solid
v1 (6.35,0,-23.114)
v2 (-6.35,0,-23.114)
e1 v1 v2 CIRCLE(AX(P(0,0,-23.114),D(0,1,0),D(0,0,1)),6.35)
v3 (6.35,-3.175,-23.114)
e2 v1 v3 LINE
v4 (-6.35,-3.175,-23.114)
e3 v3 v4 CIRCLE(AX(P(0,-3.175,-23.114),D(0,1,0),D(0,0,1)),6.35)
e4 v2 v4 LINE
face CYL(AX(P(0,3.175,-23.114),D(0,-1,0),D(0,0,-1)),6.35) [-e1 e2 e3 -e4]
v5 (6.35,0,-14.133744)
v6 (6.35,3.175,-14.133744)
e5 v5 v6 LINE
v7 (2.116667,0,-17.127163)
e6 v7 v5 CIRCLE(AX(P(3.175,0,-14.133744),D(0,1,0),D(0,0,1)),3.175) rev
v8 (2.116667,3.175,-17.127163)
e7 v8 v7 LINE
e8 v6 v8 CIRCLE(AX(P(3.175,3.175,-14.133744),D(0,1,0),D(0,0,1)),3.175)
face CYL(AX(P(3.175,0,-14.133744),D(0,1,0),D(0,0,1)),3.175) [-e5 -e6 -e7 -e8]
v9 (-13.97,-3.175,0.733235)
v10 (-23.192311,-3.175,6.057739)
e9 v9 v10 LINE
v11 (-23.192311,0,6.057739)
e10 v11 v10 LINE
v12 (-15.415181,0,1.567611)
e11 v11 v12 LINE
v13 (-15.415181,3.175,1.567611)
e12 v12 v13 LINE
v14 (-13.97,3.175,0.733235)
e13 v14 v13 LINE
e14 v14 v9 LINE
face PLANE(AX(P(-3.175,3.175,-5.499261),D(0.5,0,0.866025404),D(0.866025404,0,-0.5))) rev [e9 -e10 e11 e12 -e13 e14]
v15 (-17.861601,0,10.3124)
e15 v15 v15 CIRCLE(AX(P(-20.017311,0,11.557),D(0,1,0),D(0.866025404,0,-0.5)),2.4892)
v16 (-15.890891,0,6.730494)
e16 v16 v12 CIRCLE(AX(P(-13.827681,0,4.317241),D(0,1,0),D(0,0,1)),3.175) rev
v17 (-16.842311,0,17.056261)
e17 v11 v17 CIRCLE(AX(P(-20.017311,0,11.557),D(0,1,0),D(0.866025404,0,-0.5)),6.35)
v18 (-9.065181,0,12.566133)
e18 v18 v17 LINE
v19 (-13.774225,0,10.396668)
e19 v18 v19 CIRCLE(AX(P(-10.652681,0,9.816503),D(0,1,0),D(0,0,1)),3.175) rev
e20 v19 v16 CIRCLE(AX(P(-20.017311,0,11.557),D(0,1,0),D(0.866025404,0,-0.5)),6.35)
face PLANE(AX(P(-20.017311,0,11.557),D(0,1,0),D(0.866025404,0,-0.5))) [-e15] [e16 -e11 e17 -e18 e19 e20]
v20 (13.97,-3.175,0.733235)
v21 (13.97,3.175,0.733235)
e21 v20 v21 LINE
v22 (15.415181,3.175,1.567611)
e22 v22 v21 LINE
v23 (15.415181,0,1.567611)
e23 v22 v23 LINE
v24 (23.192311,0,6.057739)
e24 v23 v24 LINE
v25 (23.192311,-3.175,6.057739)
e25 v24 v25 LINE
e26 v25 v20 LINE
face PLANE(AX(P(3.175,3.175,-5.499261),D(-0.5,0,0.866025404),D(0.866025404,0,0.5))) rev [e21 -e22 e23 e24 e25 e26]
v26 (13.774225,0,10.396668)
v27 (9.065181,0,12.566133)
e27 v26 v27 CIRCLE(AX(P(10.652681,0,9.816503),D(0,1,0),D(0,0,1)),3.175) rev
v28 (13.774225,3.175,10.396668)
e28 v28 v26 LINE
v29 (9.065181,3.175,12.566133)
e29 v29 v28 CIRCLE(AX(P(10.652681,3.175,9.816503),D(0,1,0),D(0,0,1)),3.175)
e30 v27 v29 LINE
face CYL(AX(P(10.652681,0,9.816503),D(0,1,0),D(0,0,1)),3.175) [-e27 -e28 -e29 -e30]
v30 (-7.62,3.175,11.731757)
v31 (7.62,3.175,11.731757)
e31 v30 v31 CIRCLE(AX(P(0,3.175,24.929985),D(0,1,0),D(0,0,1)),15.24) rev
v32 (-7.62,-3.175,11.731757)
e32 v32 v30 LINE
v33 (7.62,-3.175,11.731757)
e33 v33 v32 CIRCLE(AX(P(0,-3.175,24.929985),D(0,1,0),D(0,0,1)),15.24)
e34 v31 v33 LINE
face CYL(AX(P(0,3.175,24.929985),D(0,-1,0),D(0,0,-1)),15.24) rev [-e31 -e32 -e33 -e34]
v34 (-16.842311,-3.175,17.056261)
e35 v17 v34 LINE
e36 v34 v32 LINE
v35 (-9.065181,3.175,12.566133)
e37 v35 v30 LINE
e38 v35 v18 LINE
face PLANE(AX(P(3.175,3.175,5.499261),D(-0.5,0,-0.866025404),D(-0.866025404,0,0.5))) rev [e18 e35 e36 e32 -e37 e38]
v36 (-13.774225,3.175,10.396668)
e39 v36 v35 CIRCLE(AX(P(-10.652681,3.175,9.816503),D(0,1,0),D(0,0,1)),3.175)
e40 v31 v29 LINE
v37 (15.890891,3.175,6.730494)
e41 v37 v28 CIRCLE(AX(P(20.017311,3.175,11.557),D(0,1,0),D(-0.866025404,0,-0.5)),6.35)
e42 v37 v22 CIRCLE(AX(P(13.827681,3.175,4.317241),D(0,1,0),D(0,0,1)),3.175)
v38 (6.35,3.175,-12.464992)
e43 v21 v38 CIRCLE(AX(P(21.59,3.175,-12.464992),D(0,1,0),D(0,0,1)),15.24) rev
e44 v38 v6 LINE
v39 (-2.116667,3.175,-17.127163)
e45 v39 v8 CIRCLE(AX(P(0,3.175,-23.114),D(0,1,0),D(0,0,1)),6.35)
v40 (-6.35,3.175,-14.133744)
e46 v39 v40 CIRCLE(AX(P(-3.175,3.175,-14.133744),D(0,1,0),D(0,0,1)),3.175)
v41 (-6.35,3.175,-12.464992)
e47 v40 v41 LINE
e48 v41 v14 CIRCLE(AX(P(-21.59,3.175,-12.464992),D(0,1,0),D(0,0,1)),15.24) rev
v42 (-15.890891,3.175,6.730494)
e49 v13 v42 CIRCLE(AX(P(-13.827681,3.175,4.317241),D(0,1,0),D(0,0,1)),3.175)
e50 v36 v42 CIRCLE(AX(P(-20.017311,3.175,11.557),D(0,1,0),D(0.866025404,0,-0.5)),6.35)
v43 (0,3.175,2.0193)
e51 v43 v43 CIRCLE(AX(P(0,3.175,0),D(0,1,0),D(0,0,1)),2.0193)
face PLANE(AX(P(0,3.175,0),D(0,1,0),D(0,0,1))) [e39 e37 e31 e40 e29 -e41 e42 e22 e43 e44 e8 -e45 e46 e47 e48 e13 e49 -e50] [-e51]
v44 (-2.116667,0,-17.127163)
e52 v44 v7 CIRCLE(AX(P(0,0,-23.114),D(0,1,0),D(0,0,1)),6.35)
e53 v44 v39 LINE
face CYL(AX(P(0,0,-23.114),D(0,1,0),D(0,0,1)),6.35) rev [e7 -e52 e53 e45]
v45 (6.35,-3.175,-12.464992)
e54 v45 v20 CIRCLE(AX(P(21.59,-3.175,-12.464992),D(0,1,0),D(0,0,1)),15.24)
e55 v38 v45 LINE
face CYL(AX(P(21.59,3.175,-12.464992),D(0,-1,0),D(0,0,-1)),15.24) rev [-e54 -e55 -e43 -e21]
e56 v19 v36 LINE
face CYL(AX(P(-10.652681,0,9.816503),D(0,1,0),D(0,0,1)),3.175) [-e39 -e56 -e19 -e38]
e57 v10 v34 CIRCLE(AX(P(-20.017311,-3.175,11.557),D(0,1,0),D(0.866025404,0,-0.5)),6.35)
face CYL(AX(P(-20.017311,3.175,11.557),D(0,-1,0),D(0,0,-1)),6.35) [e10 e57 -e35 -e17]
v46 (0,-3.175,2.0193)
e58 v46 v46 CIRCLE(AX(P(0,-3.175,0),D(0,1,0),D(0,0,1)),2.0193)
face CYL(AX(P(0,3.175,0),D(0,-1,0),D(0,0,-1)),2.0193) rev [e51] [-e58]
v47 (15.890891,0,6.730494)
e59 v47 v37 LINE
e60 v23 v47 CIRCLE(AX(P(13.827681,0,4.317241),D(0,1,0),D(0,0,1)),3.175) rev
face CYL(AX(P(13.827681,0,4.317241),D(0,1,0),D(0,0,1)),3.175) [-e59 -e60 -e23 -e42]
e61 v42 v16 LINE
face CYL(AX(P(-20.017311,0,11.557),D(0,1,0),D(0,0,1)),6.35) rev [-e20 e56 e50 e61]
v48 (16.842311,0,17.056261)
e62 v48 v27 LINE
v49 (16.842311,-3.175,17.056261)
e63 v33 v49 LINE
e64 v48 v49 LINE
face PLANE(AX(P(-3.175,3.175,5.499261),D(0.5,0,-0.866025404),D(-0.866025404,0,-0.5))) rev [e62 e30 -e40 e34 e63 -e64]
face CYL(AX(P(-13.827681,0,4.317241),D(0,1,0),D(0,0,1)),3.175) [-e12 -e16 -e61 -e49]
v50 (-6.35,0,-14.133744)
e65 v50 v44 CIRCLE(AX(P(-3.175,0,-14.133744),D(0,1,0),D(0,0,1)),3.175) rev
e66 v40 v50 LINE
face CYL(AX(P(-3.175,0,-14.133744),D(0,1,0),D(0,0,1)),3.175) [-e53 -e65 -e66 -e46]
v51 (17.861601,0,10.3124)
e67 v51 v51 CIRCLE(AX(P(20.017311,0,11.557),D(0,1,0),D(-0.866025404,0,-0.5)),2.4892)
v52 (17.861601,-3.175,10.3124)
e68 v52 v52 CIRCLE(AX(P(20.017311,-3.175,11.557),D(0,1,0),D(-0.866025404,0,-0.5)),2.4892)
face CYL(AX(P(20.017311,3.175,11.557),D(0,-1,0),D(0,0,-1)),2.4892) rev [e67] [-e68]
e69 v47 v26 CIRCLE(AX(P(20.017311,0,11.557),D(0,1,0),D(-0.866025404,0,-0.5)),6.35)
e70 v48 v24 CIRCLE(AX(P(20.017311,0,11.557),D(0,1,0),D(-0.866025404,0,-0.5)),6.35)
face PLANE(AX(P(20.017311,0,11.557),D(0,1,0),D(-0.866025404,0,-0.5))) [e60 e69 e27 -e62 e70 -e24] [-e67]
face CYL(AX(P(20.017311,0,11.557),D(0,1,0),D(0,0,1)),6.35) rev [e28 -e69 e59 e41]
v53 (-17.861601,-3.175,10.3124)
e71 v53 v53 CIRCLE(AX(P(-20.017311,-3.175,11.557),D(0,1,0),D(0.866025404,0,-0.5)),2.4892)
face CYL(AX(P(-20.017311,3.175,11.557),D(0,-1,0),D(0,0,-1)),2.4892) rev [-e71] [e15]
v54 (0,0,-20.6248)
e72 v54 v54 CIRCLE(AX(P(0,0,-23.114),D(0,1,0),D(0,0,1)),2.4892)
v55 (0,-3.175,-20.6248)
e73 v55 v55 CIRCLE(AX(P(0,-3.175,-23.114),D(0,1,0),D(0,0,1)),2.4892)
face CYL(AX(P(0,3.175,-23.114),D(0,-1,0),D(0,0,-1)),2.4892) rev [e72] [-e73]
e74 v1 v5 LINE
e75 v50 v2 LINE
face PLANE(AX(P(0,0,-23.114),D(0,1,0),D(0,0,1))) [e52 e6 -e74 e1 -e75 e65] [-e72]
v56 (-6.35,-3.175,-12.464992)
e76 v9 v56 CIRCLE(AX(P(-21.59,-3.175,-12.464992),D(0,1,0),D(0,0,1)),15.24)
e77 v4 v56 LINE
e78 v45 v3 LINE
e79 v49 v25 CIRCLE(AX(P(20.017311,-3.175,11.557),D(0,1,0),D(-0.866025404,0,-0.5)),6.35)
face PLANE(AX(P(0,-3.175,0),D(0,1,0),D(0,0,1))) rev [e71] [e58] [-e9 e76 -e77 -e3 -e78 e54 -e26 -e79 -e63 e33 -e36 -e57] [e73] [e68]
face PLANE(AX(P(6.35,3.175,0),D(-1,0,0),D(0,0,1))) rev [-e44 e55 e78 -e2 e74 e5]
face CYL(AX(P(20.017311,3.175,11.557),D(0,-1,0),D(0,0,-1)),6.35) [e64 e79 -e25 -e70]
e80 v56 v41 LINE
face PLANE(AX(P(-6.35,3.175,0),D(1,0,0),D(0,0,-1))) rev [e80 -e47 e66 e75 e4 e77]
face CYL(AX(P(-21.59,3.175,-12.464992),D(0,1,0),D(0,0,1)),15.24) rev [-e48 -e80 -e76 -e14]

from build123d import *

# Parameters (mm, degrees)
SKETCH1_R           = 2.0193
SKETCH1_R_2         = 2.4892
BOSS_EXTRUDE1_DEPTH = 3.175
SKETCH3_R           = 6.35
SKETCH3_R_2         = 2.4892
CUT_EXTRUDE1_DEPTH  = 3.175
CIRPATTERN1_COUNT   = 3
FILLET3_R           = 15.24
FILLET2_DEPTH       = 3.175


with BuildPart() as part:
    # Sketch1 → Boss-Extrude1 (new, symmetric)
    with BuildSketch(Plane(origin=(0, 0, 0), x_dir=(1, 0, 0), z_dir=(0, 1, 0))):
        with BuildLine():
            Line((-6.35, 0), (-6.35, 23.114))
            ThreePointArc((-6.35, 23.114), (0, 29.464), (6.35, 23.114))
            Line((6.35, 23.114), (6.35, 0))
            ThreePointArc((6.35, 0), (0, -6.35), (-6.35, 0))
        make_face()
        with Locations(Location((0, 0, 0), (0, 0, 270))):
            Circle(SKETCH1_R, mode=Mode.SUBTRACT)
        with Locations(Location((0, 23.114, 0), (0, 0, 270))):
            Circle(SKETCH1_R_2, mode=Mode.SUBTRACT)
    boss_extrude1 = extrude(amount=BOSS_EXTRUDE1_DEPTH, both=True)

    # Sketch3 → Cut-Extrude1 (cut)
    with BuildSketch(Plane(origin=(0, 3.175, 0), x_dir=(1, 0, 0), z_dir=(0, 1, 0))):
        with Locations((0, 23.114)):
            Circle(SKETCH3_R)
        with Locations(Location((0, 23.114, 0), (0, 0, 270))):
            Circle(SKETCH3_R_2, mode=Mode.SUBTRACT)
    cut_extrude1 = extrude(amount=-CUT_EXTRUDE1_DEPTH, mode=Mode.SUBTRACT)

    # CirPattern1: Boss-Extrude1, Cut-Extrude1 ×3 about axis
    cirpattern1_axis = Axis((0, 0, 0), (0, 1, 0))
    add([boss_extrude1.rotate(cirpattern1_axis, i * 360 / CIRPATTERN1_COUNT) for i in range(1, CIRPATTERN1_COUNT)])
    add([cut_extrude1.rotate(cirpattern1_axis, i * 360 / CIRPATTERN1_COUNT) for i in range(1, CIRPATTERN1_COUNT)], mode=Mode.SUBTRACT)

    # Fillet3
    fillet3_edges = [part.edges().sort_by_distance(p)[0] for p in [
        (-6.35, 0, -3.666174209),
        (6.35, 0, -3.666174209),
        (0, 0, 7.332348419),
    ]]
    fillet(fillet3_edges, radius=FILLET3_R)

    # Fillet2: read off the stored shape, not the designer's step
    # Fillet2 outline → Fillet2 (cut)
    with BuildSketch(Plane(origin=(0, 0, 0), x_dir=(1, 0, 0), z_dir=(0, 1, 0))):
        with BuildLine():
            ThreePointArc((15.41518125, -1.567610625), (16.989288832, -4.025929604), (15.890891228, -6.730494188))
            ThreePointArc((15.890891228, -6.730494188), (19.434687828, -5.233784835), (23.192311183, -6.057738686))
            Line((23.192311183, -6.057738686), (15.41518125, -1.567610625))
        make_face()
        with BuildLine():
            ThreePointArc((16.842311183, -17.056261314), (14.249934539, -14.214040956), (13.774224561, -10.396668398))
            ThreePointArc((13.774224561, -10.396668398), (11.981201728, -12.700190919), (9.06518125, -12.566133253))
            Line((9.06518125, -12.566133253), (16.842311183, -17.056261314))
        make_face()
        with BuildLine():
            ThreePointArc((-9.06518125, -12.566133253), (-11.981201728, -12.700190919), (-13.774224561, -10.396668398))
            ThreePointArc((-13.774224561, -10.396668398), (-14.249934539, -14.214040956), (-16.842311183, -17.056261314))
            Line((-16.842311183, -17.056261314), (-9.06518125, -12.566133253))
        make_face()
        with BuildLine():
            ThreePointArc((-23.192311183, -6.057738686), (-19.434687828, -5.233784835), (-15.890891228, -6.730494188))
            ThreePointArc((-15.890891228, -6.730494188), (-16.989288832, -4.025929604), (-15.41518125, -1.567610625))
            Line((-15.41518125, -1.567610625), (-23.192311183, -6.057738686))
        make_face()
        with BuildLine():
            ThreePointArc((-6.35, 14.133743879), (-5.008087105, 16.726120523), (-2.116666667, 17.127162586))
            ThreePointArc((-2.116666667, 17.127162586), (-5.184753289, 19.447825791), (-6.35, 23.114))
            Line((-6.35, 23.114), (-6.35, 14.133743879))
        make_face()
        with BuildLine():
            ThreePointArc((2.116666667, 17.127162586), (5.008087105, 16.726120523), (6.35, 14.133743879))
            Line((6.35, 14.133743879), (6.35, 23.114))
            ThreePointArc((6.35, 23.114), (5.184753289, 19.447825791), (2.116666667, 17.127162586))
        make_face()
    extrude(amount=FILLET2_DEPTH, mode=Mode.SUBTRACT)


solid = part.part
